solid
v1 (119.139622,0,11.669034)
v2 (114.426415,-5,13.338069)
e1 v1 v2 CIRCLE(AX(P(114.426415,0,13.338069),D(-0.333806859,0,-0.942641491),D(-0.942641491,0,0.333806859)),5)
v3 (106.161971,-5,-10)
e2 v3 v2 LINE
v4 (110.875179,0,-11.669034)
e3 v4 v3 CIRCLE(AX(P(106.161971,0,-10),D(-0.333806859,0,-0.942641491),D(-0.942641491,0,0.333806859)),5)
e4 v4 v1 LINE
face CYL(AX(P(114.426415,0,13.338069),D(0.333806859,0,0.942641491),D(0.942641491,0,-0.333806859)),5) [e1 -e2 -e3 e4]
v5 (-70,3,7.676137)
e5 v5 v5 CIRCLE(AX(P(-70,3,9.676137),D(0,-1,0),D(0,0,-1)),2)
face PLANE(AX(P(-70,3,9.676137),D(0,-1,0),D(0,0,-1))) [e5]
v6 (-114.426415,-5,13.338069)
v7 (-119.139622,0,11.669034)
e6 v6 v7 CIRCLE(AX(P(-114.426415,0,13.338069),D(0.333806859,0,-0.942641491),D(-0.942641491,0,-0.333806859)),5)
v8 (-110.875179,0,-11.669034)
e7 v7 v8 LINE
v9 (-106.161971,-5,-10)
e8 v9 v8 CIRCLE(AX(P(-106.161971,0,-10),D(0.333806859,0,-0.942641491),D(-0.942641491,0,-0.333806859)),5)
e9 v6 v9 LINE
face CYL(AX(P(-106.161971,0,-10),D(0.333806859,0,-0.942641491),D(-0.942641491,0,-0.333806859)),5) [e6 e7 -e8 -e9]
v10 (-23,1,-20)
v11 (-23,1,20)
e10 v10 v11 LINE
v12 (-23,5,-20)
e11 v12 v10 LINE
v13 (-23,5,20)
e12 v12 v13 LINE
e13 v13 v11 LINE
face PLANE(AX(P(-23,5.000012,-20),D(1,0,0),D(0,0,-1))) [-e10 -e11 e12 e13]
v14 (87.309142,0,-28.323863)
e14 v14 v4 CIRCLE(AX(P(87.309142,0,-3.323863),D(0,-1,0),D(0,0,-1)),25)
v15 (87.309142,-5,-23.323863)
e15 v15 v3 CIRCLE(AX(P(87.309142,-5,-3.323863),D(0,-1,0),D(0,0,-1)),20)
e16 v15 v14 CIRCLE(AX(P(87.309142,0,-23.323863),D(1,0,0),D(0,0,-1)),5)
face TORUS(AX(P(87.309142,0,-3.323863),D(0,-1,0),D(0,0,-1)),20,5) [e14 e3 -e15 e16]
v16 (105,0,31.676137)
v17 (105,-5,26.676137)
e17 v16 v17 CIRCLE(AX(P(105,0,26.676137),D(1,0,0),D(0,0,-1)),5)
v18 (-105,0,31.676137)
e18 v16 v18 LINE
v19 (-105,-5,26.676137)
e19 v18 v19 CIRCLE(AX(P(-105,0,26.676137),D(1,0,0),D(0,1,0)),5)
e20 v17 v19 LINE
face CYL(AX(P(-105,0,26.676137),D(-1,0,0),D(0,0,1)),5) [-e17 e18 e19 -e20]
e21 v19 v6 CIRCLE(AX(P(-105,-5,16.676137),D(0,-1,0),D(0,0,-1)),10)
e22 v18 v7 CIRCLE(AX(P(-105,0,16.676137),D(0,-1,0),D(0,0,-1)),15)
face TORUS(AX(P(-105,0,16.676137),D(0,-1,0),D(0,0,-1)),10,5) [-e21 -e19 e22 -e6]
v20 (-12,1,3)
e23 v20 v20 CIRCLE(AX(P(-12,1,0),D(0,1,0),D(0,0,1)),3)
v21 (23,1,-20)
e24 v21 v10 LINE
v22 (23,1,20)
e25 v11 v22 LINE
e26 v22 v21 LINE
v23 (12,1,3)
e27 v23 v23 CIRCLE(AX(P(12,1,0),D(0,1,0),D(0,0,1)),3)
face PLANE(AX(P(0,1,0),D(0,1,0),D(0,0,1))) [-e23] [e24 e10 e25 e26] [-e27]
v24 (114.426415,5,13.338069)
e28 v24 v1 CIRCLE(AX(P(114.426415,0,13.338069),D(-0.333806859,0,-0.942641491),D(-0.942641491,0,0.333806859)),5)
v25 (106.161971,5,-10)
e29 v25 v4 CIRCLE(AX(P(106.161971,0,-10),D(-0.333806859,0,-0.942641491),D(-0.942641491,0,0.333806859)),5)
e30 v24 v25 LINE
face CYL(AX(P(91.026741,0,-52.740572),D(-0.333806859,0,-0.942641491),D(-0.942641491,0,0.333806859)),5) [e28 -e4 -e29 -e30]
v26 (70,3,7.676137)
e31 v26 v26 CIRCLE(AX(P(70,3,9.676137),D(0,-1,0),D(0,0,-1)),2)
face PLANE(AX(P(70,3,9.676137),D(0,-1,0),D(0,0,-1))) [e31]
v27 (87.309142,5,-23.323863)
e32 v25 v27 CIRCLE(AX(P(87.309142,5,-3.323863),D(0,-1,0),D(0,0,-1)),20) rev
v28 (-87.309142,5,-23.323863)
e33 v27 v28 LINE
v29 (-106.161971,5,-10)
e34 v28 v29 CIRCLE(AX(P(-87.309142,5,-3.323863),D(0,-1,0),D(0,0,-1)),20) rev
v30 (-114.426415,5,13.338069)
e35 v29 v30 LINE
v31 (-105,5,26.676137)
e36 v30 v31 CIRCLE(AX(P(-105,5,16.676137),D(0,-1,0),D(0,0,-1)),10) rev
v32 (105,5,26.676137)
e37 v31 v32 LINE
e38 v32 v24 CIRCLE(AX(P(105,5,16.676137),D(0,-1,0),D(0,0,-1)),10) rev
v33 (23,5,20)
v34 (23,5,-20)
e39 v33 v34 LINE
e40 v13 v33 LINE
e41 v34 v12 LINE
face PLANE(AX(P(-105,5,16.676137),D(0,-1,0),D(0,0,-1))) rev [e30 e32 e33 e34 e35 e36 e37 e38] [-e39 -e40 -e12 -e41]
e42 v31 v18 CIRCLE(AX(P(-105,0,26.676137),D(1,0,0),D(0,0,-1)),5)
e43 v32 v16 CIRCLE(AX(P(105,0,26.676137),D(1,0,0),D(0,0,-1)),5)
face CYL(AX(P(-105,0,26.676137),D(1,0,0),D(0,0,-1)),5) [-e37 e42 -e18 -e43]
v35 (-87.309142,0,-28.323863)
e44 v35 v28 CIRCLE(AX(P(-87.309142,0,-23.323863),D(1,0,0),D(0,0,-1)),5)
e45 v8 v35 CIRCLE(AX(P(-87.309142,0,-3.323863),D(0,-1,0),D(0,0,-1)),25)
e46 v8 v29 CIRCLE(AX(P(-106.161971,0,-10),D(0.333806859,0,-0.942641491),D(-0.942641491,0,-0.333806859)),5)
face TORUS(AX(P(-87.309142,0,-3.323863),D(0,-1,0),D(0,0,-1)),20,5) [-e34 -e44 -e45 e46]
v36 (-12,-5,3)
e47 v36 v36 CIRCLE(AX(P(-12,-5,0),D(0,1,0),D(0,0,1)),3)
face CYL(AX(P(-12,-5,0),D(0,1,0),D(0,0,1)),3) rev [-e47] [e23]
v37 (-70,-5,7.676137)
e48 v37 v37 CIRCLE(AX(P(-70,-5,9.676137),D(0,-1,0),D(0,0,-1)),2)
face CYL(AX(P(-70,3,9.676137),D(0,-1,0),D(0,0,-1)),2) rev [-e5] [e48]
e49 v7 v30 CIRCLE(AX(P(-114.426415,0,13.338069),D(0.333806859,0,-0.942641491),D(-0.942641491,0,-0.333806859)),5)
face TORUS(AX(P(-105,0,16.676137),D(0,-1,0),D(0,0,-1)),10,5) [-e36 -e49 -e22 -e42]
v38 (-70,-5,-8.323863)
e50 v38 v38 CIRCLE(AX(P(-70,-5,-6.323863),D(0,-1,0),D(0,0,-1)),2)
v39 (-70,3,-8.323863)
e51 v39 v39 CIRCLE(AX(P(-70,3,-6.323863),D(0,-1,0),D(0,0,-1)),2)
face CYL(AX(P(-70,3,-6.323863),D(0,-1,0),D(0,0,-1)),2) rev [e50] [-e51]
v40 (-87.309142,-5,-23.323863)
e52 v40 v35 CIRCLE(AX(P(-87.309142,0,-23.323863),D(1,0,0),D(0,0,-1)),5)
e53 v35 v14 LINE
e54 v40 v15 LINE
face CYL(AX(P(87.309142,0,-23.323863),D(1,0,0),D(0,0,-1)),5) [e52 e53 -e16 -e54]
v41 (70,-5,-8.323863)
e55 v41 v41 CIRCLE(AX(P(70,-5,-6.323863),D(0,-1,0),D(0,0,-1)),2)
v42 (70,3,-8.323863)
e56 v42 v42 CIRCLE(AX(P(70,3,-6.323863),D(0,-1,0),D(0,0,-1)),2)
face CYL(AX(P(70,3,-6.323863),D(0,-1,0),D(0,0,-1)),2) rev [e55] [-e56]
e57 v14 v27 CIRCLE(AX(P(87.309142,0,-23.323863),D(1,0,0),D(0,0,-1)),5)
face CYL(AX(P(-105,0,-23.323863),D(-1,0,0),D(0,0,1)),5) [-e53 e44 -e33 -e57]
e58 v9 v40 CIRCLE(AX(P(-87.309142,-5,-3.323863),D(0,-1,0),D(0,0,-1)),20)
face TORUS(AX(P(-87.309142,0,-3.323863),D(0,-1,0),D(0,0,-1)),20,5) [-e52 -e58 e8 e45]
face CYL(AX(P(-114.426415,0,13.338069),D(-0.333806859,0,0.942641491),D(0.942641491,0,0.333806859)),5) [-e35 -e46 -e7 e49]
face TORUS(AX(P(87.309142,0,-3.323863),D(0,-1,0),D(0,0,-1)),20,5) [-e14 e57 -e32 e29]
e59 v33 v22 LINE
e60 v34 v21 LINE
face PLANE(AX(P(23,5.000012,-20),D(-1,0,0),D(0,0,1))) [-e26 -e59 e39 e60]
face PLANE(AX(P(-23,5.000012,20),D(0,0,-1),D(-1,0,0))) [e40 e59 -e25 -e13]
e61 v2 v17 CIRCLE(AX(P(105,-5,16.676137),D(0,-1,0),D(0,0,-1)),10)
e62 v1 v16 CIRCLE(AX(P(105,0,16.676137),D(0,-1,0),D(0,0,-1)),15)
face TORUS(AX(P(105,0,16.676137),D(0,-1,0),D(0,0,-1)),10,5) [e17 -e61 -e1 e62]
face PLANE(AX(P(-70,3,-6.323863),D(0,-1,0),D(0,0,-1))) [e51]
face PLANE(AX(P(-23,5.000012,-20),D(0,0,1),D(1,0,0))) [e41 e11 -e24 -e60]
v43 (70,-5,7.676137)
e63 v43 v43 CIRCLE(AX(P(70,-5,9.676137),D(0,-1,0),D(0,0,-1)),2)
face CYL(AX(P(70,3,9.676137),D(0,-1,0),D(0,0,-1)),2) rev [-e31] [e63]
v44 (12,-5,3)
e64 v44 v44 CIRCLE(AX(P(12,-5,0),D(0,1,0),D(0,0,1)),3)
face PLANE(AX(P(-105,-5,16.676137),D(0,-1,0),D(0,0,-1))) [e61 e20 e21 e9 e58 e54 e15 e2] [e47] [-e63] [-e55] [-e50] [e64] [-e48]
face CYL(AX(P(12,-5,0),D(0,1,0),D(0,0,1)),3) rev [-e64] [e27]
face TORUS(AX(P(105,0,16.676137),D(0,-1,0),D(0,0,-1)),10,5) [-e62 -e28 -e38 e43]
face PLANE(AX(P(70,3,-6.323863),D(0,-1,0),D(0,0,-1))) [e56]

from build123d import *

# Parameters (mm, degrees)
BOSS_EXTRUDE1_DEPTH     = 5
CUT_EXTRUDE1_DEPTH      = 125.512560278
CUT_EXTRUDE1_DEPTH_BACK = 4
SKETCH2_W               = 46
SKETCH2_H               = 40
SKETCH3_R               = 3
CUT_EXTRUDE2_DEPTH      = 125.25529231
SKETCH4_R               = 2
CUT_EXTRUDE3_DEPTH      = 8
FILLET1_R               = 5


with BuildPart() as part:
    # Sketch1 → Boss-Extrude1 (new, symmetric)
    with BuildSketch(Plane(origin=(0, 0, 0), x_dir=(1, 0, 0), z_dir=(0, 1, 0))):
        with BuildLine():
            Line((-105, -31.676137185), (105, -31.676137185))
            ThreePointArc((105, -31.676137185), (117.249623327, -25.333315035), (119.139622366, -11.669034296))
            Line((119.139622366, -11.669034296), (110.875178831, 11.669034296))
            ThreePointArc((110.875178831, 11.669034296), (101.737771304, 23.739901694), (87.309141554, 28.323862815))
            Line((87.309141554, 28.323862815), (-87.309141554, 28.323862815))
            ThreePointArc((-87.309141554, 28.323862815), (-101.737771304, 23.739901694), (-110.875178831, 11.669034296))
            Line((-110.875178831, 11.669034296), (-119.139622366, -11.669034296))
            ThreePointArc((-119.139622366, -11.669034296), (-117.249623327, -25.333315035), (-105, -31.676137185))
        make_face()
    extrude(amount=BOSS_EXTRUDE1_DEPTH, both=True)

    # Sketch2 → Cut-Extrude1 (cut, two sides: drawn at the far end of the back side and taken through both)
    with BuildSketch(Plane(origin=(0, 5, 0), x_dir=(1, 0, 0), z_dir=(0, 1, 0)).offset(-CUT_EXTRUDE1_DEPTH_BACK)):
        Rectangle(SKETCH2_W, SKETCH2_H)
    extrude(amount=CUT_EXTRUDE1_DEPTH + CUT_EXTRUDE1_DEPTH_BACK, mode=Mode.SUBTRACT)

    # Sketch3 → Cut-Extrude2 (cut, through all)
    with BuildSketch(Plane(origin=(0, 1, 0), x_dir=(1, 0, 0), z_dir=(0, 1, 0))):
        with Locations(Location((12, 0, 0), (0, 0, 270))):
            Circle(SKETCH3_R)
        with Locations(Location((-12, 0, 0), (0, 0, 270))):
            Circle(SKETCH3_R)
    extrude(amount=-CUT_EXTRUDE2_DEPTH, mode=Mode.SUBTRACT)

    # Sketch4 → Cut-Extrude3 (cut)
    with BuildSketch(Plane.XZ.offset(5)):
        with Locations(Location((-70, 9.676137185, 0), (0, 0, 270))):
            Circle(SKETCH4_R)
        with Locations(Location((-70, -6.323862815, 0), (0, 0, 270))):
            Circle(SKETCH4_R)
        with Locations(Location((70, -6.323862815, 0), (0, 0, 270))):
            Circle(SKETCH4_R)
        with Locations(Location((70, 9.676137185, 0), (0, 0, 270))):
            Circle(SKETCH4_R)
    extrude(amount=-CUT_EXTRUDE3_DEPTH, mode=Mode.SUBTRACT)

    # Fillet1
    fillet1_edges = [part.edges().sort_by_distance(p)[0] for p in [
        (101.737771304, -5, -23.739901694),
        (115.007400599, -5, 0),
        (117.249623327, -5, 25.333315035),
        (0, -5, 31.676137185),
        (-117.249623327, -5, 25.333315035),
        (-115.007400599, -5, 0),
        (-101.737771304, -5, -23.739901694),
        (-117.249623327, 5, 25.333315035),
        (-115.007400599, 5, 0),
        (-101.737771304, 5, -23.739901694),
        (0, 5, -28.323862815),
        (101.737771304, 5, -23.739901694),
        (115.007400599, 5, 0),
        (117.249623327, 5, 25.333315035),
        (0, -5, -28.323862815),
        (0, 5, 31.676137185),
    ]]
    fillet(fillet1_edges, radius=FILLET1_R - 0.0001)  # a hair under: the kernel refuses the full size


solid = part.part
